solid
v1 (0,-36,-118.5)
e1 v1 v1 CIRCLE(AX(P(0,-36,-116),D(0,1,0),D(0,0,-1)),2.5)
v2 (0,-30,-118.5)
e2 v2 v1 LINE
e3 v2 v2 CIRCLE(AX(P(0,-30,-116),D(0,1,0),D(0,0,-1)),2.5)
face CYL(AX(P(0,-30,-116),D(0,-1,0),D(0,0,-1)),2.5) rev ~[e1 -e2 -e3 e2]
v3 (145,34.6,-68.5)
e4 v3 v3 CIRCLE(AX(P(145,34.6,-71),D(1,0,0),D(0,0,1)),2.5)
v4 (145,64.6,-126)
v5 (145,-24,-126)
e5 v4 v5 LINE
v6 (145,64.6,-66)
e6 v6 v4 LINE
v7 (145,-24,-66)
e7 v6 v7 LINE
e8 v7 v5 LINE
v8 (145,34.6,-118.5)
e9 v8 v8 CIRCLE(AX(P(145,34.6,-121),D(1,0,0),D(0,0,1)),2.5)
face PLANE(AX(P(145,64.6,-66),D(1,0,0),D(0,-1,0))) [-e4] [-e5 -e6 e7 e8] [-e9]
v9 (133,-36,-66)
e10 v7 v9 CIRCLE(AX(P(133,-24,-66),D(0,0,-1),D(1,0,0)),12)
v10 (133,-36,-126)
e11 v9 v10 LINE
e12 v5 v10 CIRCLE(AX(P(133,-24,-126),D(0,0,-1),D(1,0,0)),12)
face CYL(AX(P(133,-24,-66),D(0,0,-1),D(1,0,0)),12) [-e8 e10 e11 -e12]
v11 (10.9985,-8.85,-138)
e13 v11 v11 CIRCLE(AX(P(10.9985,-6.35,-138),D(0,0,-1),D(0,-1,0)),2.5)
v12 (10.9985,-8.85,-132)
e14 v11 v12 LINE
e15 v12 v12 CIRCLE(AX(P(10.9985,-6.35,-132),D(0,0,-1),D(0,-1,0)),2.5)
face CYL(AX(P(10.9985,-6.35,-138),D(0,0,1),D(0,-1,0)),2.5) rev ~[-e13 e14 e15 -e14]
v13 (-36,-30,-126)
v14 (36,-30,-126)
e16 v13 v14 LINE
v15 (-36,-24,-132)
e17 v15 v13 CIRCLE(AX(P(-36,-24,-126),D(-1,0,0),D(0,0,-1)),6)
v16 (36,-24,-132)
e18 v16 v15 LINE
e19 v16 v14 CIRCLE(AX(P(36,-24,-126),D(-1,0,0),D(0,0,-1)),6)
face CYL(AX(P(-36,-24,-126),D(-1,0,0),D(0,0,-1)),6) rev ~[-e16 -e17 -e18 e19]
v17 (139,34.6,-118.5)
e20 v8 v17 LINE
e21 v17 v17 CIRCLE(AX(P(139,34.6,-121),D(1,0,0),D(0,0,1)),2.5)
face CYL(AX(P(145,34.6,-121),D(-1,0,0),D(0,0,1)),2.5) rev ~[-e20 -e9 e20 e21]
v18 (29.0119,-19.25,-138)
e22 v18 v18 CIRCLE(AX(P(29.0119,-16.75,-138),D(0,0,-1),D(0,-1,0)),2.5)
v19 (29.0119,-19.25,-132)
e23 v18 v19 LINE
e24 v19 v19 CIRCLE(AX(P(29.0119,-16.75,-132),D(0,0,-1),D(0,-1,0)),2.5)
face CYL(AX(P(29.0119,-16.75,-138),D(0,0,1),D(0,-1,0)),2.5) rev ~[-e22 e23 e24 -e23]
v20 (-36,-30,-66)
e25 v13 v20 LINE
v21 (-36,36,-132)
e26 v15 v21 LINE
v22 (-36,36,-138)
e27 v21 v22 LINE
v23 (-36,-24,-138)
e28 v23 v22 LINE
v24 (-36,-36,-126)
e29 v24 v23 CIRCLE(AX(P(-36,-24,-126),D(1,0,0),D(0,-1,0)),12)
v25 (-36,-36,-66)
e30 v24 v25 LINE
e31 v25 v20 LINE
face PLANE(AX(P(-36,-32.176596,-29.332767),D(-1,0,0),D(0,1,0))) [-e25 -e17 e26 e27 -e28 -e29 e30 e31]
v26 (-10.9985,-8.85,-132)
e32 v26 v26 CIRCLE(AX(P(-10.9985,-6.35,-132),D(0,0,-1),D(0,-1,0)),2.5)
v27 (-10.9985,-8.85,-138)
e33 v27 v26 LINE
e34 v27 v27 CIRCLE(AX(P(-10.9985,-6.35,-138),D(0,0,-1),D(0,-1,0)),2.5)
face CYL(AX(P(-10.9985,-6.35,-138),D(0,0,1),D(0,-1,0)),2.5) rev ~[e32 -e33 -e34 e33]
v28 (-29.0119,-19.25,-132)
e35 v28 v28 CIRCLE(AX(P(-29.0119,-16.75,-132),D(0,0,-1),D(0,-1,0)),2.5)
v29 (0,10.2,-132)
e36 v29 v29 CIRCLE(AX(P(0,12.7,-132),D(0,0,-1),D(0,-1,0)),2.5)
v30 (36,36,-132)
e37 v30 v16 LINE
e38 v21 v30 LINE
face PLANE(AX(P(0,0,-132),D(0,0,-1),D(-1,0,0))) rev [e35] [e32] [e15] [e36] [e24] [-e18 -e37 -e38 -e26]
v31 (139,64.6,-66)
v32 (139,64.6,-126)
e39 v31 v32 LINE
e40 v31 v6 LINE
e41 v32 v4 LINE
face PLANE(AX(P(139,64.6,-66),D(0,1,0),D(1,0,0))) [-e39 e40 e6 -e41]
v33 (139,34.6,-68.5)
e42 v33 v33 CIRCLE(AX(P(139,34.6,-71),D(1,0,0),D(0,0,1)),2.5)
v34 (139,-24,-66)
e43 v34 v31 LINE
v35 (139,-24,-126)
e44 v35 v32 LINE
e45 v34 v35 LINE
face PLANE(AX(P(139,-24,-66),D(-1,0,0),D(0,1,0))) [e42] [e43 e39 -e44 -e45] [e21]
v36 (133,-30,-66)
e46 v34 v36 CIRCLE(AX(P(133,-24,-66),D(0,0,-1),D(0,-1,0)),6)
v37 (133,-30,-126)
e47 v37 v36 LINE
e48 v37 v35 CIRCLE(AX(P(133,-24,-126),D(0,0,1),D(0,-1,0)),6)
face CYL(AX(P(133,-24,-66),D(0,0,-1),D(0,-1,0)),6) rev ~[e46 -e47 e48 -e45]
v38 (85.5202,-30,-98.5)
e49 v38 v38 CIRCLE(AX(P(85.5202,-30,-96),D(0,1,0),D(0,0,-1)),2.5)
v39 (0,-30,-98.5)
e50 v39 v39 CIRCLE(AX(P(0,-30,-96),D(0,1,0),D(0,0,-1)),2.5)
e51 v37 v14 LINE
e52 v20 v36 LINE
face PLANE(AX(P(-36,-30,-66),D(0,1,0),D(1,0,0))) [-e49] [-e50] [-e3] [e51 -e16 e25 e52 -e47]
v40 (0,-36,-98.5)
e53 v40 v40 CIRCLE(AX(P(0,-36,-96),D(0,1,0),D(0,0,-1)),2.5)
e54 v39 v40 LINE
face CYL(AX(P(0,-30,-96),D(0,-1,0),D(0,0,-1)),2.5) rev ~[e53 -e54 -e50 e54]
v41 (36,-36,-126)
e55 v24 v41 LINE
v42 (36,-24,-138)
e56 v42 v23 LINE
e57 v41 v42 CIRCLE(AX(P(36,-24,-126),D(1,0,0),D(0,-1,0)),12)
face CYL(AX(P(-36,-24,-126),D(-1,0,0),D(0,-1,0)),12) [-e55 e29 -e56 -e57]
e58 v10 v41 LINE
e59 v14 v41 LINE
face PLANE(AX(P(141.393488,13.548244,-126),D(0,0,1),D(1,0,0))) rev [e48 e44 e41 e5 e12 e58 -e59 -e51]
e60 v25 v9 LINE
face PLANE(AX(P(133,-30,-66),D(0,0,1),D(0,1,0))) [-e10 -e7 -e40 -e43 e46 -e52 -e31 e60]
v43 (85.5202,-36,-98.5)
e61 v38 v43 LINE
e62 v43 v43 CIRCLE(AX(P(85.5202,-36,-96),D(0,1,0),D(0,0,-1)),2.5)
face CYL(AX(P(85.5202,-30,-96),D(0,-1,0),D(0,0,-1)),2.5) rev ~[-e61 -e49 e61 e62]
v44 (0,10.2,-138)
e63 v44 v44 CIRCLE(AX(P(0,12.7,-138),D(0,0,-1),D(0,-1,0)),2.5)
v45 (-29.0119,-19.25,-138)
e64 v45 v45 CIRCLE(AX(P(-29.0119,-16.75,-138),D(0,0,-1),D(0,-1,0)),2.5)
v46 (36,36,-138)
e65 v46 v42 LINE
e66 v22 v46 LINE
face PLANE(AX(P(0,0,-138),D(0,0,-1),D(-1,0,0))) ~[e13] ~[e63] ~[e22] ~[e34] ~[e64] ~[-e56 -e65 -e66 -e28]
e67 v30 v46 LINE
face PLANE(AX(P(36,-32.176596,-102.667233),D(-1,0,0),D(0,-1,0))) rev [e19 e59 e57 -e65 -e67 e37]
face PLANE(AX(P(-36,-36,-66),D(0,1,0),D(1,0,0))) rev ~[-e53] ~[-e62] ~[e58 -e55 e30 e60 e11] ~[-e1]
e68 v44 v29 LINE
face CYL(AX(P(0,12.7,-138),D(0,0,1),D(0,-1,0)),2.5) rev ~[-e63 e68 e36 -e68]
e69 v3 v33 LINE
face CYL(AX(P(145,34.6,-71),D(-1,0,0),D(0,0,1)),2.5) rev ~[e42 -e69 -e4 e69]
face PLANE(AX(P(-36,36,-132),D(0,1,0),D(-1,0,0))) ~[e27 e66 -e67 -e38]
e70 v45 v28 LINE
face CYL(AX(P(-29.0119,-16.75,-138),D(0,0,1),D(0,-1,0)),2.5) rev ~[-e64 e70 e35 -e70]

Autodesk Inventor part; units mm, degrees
ref_plane "YZ Plane" through (0, 0, 0) normal (1, 0, 0) x (0, 1, 0)
ref_plane "XZ Plane" through (0, 0, 0) normal (0, 1, 0) x (-1, 0, 0)
sketch "Sketch1" plane through (0, 0, 0) normal (0, 0, 1) x (1, 0, 0)
  line L0 (-36, 36) -> (36, 36)
  line L1 (36, 36) -> (36, -36)
  line L2 (36, -36) -> (-36, -36)
  line L3 (-36, -36) -> (-36, 36)
  point P0 (0, 0)
  dimension "d0" = 72
  dimension "d1" = 36
  dimension "d2" = 72
  dimension "d3" = 36
extrude "Plate1" add sketch "Sketch1" along normal blind 6
sketch "Sketch2" plane through (-36, -30, 6) normal (0, -1, 0) x (1, 0, 0)
  line L0 (72, 0) -> (0, 0)
  line L1 (0, 0) -> (0, -72)
  line L2 (0, -72) -> (72, -72)
  line L3 (72, -72) -> (72, 0)
edge flange "Flange1" height 72 angle 90 thickness 6 bend radius 6 thickness toward (0, -1, 0) relief tear relief width 6 relief depth 3 edges at (0, -36, 0) wall of the first edge with corners at (36, -30, 6) (-36, -30, 6) (-36, -30, -66) (36, -30, -66)
bend "Bend1"
corner "Corner1"
sketch "Sketch3" plane through (-36, -30, -66) normal (0, 1, 0) x (1, 0, 0)
  line L0 (72, -60) -> (72, 0)
  line L1 (72, 0) -> (181, 0)
  line L2 (181, 0) -> (181, -60)
  line L3 (181, -60) -> (72, -60)
  line L4 (72, -60) -> (72, 0)
  point P0 (36, -66)
  dimension "d15" = 109
  dimension "d16" = 60
sheet face with bend "Face2" sketch "Sketch3" thickness 6 toward (0, -1, 0) bend radius 6
bend "Bend2"
sketch "Sketch4" plane through (139, -36, -66) normal (1, 0, 0) x (0, 1, 0)
  line L0 (0, 60) -> (0, 0)
  line L1 (0, 0) -> (100.6, 0)
  line L2 (100.6, 0) -> (100.6, 60)
  line L3 (100.6, 60) -> (0, 60)
edge flange "Flange2" height 100.6 angle 90 thickness 6 bend radius 6 thickness toward (1, 0, 0) relief tear relief width 6 relief depth 3 edges at (145, -30, -36) wall of the first edge with corners at (139, -36, -6) (139, -36, -66) (139, 64.6, -66) (139, 64.6, -6)
bend "Bend3"
corner "Corner2"
sketch "Sketch5" plane through (145, 64.6, -6) normal (1, 0, 0) x (0, 0, -1)
  circle A0 centre (30, -30) radius 25
  line L0 (60, 0) -> (60, -88.6) projected
  line L1 (0, -88.6) -> (0, 0) projected
  line L2 (0, 0) -> (60, 0) projected
  point P0 (-6, -64.6)
  point P1 (55, -30)
  point P2 (5, -30)
  dimension "d32" = 60
  dimension "d33" = 30
  dimension "d34" = 30
  dimension "d35" = 50
  dimension "d36" = 30
  dimension "d37" = 30
hole "Hole1" at (145, 34.6, -11) at (145, 34.6, -61) direction (-1, 0, 0) diameter 5 end through all
sketch "Sketch6" plane through (0, 0, 6) normal (0, 0, 1) x (1, 0, 0)
  circle A0 centre (0, 0) radius 12.7
  line L0 (36, -36) -> (-36, -36) projected
  circle A1 centre (0, 0) radius 33.5
  line L1 (0, 0) -> (29.0119, -16.75)
  line L2 (0, 0) -> (-29.0119, -16.75)
  line L3 (0, 0) -> (0, 33.5)
  point P0 (0, 0)
  point P1 (0, 12.7)
  point P2 (10.9985, -6.35)
  point P3 (-10.9985, -6.35)
  dimension "d45" = 36
  dimension "d46" = 25.4
  dimension "d47" = 67
  dimension "d48" = 120
  dimension "d49" = 120
  dimension "d50" = 0
hole "Hole2" at (0, 12.7, 6) at (-10.9985, -6.35, 6) at (10.9985, -6.35, 6) at (29.0119, -16.75, 6) at (-29.0119, -16.75, 6) direction (0, 0, -1) diameter 5 end through all
sketch "Sketch7" plane through (-36, -30, -6) normal (0, 1, 0) x (1, 0, 0)
  line L0 (169, 60) -> (0, 60) projected
  line L1 (169, 0) -> (72, 0) projected
  line L2 (0, 0) -> (0, 60) projected
  line L3 (72, 0) -> (72, 20) projected
  point P0 (36, -6)
  point P1 (121.5202, 30)
  point P2 (36, 30)
  point P3 (36, 10)
  dimension "d65" = 60
  dimension "d66" = 72
  dimension "d67" = 30
  dimension "d68" = 30
  dimension "d69" = 36
  dimension "d70" = 20
  dimension "d71" = 10
  dimension "d72" = 36
  dimension "d73" = 99.0404
  dimension "d74" = 49.5202
hole "Hole3" at (85.5202, -30, -36) at (0, -30, -36) at (0, -30, -16) direction (0, -1, 0) diameter 5 end through all
mirror "Mirror1" about plane through (139, -24, -66) normal (0, 0, -1)
ref_plane "Work Plane1" through (133, -30, -66) normal (0, 0, -1) x (-1, 0, 0)
split "Split1" plane through (133, -30, -66) removes the side toward (0, 0, 1)
equation "\"d67\" = 0.5 * d65"
equation "\"d68\" = 0.5 * d65"
equation "\"d69\" = 0.5 * d66"
equation "\"d71\" = 0.5 * d70"
equation "\"d72\" = 0.5 * d66"
equation "\"d74\" = 0.5 * d73"
equation "\"d1\" = 0.5 * d0"
equation "\"d2\" = d0"
equation "\"d33\" = 0.5 * d32"
equation "\"d34\" = d33"
equation "\"d36\" = d34"
equation "\"d37\" = d36"
equation "\"d43\" = Thickness"
equation "\"d49\" = d48"
equation "\"d56\" = Thickness"
equation "\"d63\" = Thickness"
equation "\"d4\" = Thickness"
equation "\"d5\" = BendReliefWidth"
equation "\"d6\" = BendReliefDepth"
equation "\"d7\" = MinimumRemnant"
equation "\"d8\" = TransitionRadius"
equation "\"d11\" = BendRadius"
equation "\"d12\" = CornerReliefSize"
equation "\"d13\" = GapSize"
equation "\"d14\" = JacobiRadiusSize"
equation "\"d17\" = BendRadius"
equation "\"d18\" = BendReliefWidth"
equation "\"d20\" = MinimumRemnant"
equation "\"d19\" = BendReliefDepth"
equation "\"d21\" = TransitionRadius"
equation "\"d22\" = BendReliefWidth"
equation "\"d23\" = BendReliefDepth"
equation "\"d24\" = MinimumRemnant"
equation "\"d25\" = TransitionRadius"
equation "\"d28\" = BendRadius"
equation "\"d29\" = CornerReliefSize"
equation "\"d30\" = GapSize"
equation "\"d31\" = JacobiRadiusSize"
equation "\"d3\" = d1"
equation "\"BendRadius\" = Thickness"
equation "\"BendReliefWidth\" = Thickness"
equation "\"BendReliefDepth\" = 0.5 * Thickness"
equation "\"CornerReliefSize\" = 4 * Thickness"
equation "\"MinimumRemnant\" = 2 * Thickness"
equation "\"TransitionRadius\" = BendRadius"
equation "\"JacobiRadiusSize\" = BendRadius"
equation "\"GapSize\" = Thickness"
equation "\"Thickness\" = 6"
properties part number "motorHolder" material "Steel, Mild"
